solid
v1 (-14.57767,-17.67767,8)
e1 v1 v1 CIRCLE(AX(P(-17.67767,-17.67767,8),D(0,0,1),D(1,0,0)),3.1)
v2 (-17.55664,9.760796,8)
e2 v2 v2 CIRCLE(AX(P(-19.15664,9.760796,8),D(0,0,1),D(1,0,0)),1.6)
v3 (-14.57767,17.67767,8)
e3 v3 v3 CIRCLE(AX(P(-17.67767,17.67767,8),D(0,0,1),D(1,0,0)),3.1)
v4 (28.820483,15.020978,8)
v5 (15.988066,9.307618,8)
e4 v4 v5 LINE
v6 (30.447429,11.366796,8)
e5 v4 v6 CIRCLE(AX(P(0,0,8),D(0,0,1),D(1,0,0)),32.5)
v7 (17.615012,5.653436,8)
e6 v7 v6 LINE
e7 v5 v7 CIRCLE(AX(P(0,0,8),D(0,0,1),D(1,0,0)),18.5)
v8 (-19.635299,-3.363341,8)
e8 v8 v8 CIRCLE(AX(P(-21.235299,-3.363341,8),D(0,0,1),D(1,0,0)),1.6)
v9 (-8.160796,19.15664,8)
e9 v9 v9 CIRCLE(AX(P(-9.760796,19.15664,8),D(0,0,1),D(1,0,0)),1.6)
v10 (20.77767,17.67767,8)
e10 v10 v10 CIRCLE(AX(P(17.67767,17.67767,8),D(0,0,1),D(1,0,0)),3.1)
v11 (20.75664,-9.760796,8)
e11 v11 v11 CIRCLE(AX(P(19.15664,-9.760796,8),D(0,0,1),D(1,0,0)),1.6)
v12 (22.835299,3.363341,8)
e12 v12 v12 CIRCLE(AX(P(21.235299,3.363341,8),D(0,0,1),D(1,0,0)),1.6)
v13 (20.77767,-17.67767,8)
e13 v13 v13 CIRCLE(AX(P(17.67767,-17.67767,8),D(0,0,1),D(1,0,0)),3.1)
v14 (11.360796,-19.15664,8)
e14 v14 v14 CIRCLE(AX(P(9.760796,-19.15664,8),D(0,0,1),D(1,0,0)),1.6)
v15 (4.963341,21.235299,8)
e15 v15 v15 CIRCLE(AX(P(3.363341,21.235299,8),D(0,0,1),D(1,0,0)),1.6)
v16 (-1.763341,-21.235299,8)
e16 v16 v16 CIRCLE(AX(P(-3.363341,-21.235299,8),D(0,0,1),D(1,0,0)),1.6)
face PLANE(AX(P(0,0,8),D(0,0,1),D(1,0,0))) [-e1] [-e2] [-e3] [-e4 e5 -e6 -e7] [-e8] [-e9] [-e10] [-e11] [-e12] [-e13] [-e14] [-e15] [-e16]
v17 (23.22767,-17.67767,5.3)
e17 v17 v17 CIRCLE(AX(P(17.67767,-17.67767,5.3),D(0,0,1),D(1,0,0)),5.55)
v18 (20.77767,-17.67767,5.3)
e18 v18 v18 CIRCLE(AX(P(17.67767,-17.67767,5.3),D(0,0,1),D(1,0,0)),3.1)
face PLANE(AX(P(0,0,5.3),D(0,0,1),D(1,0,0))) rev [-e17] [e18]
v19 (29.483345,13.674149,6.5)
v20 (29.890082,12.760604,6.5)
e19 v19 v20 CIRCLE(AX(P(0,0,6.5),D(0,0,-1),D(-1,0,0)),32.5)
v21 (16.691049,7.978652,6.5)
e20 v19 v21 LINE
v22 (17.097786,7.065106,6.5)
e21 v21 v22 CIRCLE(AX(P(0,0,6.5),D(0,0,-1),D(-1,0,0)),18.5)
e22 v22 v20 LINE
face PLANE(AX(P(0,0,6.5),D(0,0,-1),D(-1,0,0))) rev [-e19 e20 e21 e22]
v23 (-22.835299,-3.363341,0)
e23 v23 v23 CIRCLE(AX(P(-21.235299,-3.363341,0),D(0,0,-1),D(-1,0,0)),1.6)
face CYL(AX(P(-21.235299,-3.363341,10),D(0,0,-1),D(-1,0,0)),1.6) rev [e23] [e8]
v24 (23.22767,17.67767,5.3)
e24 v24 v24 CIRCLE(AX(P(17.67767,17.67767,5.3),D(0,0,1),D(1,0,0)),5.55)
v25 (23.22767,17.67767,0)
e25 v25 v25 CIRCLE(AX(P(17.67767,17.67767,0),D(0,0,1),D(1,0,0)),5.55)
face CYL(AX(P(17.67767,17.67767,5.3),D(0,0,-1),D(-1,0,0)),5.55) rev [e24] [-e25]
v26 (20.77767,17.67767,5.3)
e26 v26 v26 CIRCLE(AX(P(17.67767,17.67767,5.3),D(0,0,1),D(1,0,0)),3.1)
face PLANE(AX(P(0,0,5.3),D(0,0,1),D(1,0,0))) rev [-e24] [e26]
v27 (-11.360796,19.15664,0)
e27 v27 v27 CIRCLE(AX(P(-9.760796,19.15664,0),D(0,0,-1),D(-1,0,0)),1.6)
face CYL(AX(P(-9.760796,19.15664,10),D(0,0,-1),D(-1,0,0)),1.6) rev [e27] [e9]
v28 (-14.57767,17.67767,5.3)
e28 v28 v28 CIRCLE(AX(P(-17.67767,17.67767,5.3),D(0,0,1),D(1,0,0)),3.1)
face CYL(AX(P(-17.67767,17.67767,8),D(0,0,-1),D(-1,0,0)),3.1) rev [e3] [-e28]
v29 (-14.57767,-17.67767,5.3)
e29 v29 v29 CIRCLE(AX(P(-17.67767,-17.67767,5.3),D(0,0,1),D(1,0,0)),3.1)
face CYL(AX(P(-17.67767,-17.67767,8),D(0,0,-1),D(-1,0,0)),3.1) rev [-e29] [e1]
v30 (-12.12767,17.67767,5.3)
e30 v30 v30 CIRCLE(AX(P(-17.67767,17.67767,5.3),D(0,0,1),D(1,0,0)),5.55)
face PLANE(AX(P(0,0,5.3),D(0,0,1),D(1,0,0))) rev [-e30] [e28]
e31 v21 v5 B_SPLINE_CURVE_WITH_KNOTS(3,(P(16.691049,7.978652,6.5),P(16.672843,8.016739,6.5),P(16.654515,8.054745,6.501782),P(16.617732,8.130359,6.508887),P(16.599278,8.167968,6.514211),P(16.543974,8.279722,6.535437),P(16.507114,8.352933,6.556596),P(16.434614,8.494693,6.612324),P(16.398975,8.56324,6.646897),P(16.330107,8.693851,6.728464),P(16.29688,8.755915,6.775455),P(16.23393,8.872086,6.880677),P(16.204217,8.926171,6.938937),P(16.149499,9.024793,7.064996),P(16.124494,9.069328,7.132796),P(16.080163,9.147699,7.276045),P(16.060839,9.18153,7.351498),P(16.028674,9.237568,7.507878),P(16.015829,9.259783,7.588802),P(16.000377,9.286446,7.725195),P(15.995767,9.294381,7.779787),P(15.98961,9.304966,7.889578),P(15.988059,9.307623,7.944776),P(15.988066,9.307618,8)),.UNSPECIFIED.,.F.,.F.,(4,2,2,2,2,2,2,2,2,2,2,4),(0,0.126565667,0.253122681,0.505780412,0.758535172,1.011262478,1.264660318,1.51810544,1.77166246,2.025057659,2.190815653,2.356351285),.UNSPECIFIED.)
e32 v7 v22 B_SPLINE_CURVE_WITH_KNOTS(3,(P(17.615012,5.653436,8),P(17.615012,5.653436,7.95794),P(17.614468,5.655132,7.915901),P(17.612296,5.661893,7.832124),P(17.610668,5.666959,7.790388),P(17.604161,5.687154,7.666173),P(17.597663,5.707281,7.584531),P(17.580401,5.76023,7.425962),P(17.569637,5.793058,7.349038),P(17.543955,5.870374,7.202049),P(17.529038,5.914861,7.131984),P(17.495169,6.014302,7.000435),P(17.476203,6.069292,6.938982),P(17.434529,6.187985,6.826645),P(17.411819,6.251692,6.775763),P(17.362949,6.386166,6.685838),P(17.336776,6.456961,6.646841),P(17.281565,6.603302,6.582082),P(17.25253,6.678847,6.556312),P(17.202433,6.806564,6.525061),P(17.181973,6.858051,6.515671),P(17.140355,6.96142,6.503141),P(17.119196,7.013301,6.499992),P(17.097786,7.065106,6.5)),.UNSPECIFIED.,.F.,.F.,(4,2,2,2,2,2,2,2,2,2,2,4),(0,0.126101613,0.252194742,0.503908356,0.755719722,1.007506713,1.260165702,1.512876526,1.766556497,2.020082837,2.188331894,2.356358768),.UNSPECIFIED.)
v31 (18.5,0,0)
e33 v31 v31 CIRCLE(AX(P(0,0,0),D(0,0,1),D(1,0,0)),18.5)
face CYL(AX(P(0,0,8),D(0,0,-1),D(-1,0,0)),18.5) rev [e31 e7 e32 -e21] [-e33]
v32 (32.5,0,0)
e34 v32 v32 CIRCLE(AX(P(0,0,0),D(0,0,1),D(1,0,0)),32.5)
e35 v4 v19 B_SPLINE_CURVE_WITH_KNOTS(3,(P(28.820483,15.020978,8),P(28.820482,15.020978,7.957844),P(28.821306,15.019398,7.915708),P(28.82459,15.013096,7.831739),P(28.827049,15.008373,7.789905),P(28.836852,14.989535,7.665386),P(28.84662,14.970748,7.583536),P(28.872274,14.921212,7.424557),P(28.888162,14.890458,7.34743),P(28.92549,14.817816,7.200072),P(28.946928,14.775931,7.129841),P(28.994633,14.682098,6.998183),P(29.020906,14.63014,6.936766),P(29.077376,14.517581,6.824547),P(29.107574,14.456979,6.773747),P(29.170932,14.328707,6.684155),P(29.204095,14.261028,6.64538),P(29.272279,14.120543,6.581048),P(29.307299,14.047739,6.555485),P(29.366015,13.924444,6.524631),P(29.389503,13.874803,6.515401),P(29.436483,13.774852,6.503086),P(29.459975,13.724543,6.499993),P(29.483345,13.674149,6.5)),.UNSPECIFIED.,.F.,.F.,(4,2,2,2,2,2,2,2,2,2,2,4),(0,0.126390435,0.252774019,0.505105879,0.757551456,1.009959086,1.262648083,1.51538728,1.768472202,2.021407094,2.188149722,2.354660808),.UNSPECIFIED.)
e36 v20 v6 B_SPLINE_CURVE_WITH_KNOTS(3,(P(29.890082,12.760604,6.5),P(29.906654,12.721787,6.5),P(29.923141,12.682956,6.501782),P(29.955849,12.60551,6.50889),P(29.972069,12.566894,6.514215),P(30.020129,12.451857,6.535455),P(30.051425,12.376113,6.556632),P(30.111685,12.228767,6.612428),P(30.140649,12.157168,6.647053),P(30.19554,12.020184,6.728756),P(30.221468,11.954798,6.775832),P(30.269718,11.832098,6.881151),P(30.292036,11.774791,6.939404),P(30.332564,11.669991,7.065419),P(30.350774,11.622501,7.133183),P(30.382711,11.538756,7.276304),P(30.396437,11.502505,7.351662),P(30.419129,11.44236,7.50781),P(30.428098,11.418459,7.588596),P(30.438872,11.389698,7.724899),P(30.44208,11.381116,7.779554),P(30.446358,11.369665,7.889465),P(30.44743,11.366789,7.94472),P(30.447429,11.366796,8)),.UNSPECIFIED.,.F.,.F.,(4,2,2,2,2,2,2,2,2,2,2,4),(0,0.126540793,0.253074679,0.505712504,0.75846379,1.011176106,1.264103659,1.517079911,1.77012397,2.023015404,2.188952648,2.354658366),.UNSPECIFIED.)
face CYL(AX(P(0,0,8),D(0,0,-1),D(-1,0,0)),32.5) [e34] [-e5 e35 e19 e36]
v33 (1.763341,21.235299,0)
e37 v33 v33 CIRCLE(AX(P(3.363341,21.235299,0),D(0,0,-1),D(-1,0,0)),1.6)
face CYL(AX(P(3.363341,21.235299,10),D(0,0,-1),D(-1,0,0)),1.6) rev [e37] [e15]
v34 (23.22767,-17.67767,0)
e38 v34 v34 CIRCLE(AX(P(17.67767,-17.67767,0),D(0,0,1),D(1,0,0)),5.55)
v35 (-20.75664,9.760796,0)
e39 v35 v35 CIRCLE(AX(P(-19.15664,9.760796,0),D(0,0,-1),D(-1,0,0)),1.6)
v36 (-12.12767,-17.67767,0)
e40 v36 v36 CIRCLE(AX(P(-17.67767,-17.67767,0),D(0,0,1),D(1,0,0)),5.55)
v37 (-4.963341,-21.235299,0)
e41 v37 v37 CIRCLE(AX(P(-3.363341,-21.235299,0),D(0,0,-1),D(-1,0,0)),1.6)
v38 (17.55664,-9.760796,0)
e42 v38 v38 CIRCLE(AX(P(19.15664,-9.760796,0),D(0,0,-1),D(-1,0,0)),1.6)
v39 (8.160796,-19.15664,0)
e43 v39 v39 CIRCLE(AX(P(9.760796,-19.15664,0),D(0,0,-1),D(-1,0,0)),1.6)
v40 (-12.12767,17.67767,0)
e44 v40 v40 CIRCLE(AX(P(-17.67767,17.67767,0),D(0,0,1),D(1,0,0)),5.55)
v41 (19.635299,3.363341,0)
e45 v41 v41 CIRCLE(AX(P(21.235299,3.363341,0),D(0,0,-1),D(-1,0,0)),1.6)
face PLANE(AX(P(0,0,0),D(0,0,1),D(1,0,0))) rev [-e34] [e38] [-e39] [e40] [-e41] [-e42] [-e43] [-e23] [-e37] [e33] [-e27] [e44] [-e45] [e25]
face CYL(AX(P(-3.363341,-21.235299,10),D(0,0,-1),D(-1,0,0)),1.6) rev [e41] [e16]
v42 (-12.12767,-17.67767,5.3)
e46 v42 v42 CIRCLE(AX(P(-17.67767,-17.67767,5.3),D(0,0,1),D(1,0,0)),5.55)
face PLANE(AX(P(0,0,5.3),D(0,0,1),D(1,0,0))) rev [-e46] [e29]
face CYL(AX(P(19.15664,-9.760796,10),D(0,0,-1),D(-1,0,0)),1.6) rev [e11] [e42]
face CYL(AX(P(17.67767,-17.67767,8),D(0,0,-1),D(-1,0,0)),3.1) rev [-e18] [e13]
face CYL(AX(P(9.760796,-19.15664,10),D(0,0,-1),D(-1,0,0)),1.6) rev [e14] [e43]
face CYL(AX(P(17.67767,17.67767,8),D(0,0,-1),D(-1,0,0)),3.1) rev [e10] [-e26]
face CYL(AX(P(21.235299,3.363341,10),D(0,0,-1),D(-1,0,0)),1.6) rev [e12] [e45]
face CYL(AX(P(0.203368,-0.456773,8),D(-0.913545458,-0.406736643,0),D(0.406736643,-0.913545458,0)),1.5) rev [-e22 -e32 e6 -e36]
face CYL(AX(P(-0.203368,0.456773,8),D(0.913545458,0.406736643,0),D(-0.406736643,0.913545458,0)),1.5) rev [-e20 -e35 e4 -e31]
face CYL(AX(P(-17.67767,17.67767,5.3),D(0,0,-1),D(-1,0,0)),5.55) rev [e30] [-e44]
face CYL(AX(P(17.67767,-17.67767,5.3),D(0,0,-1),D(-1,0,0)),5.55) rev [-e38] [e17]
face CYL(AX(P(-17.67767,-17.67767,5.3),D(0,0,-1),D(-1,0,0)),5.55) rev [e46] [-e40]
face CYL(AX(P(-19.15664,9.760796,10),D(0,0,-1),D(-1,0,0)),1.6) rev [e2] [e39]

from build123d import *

# Parameters (mm, degrees)
SKETCH1_R           = 32.5
SKETCH1_R_2         = 3.1
SKETCH1_R_3         = 18.5
BOSS_EXTRUDE2_DEPTH = 8
SKETCH1_6_R         = 18.5
SKETCH1_6_R_2       = 5.55
SKETCH1_6_R_3       = 3.1
CUT_EXTRUDE2_DEPTH  = 5.3
SKETCH2_R           = 1.6
CUT_EXTRUDE3_DEPTH  = 10
CUT_EXTRUDE4_DEPTH  = 1.5
FILLET1_R           = 1.5


with BuildPart() as part:
    # Sketch1 → Boss-Extrude2 (new body)
    with BuildSketch(Plane.XY):
        Circle(SKETCH1_R)
        with Locations((17.67766953, 17.67766953)):
            Circle(SKETCH1_R_2, mode=Mode.SUBTRACT)
        with Locations((17.67766953, -17.67766953)):
            Circle(SKETCH1_R_2, mode=Mode.SUBTRACT)
        with Locations((-17.67766953, -17.67766953)):
            Circle(SKETCH1_R_2, mode=Mode.SUBTRACT)
        with Locations((-17.67766953, 17.67766953)):
            Circle(SKETCH1_R_2, mode=Mode.SUBTRACT)
        Circle(SKETCH1_R_3, mode=Mode.SUBTRACT)
    extrude(amount=BOSS_EXTRUDE2_DEPTH)

    # Sketch1<6> → Cut-Extrude2 (cut)
    # profile 1 of 8: a face of its own
    with BuildSketch(Plane.XY):
        Circle(SKETCH1_6_R)
    # profile 2 of 8: a face of its own
    with BuildSketch(Plane.XY):
        with Locations((17.67766953, 17.67766953)):
            Circle(SKETCH1_6_R_2)
        with Locations((17.67766953, 17.67766953)):
            Circle(SKETCH1_6_R_3, mode=Mode.SUBTRACT)
    # profile 3 of 8: a face of its own
    with BuildSketch(Plane.XY):
        Circle(SKETCH1_6_R)
    # profile 4 of 8: a face of its own
    with BuildSketch(Plane.XY):
        with Locations((17.67766953, -17.67766953)):
            Circle(SKETCH1_6_R_2)
        with Locations((17.67766953, -17.67766953)):
            Circle(SKETCH1_6_R_3, mode=Mode.SUBTRACT)
    # profile 5 of 8: a face of its own
    with BuildSketch(Plane.XY):
        Circle(SKETCH1_6_R)
    # profile 6 of 8: a face of its own
    with BuildSketch(Plane.XY):
        with Locations((-17.67766953, -17.67766953)):
            Circle(SKETCH1_6_R_2)
        with Locations((-17.67766953, -17.67766953)):
            Circle(SKETCH1_6_R_3, mode=Mode.SUBTRACT)
    # profile 7 of 8: a face of its own
    with BuildSketch(Plane.XY):
        Circle(SKETCH1_6_R)
    # profile 8 of 8: a face of its own
    with BuildSketch(Plane.XY):
        with Locations((-17.67766953, 17.67766953)):
            Circle(SKETCH1_6_R_2)
        with Locations((-17.67766953, 17.67766953)):
            Circle(SKETCH1_6_R_3, mode=Mode.SUBTRACT)
    extrude(amount=CUT_EXTRUDE2_DEPTH, mode=Mode.SUBTRACT)

    # Sketch2 → Cut-Extrude3 (cut)
    with BuildSketch(Plane(origin=(0, 0, 0), x_dir=(-1, 0, 0), z_dir=(0, 0, -1))):
        with Locations((9.760795744, 19.15664027)):
            Circle(SKETCH2_R)
        with Locations((19.15664027, 9.760795744)):
            Circle(SKETCH2_R)
        with Locations((21.235299323, -3.363340998)):
            Circle(SKETCH2_R)
        with Locations((3.363340998, -21.235299323)):
            Circle(SKETCH2_R)
        with Locations((-9.760795744, -19.15664027)):
            Circle(SKETCH2_R)
        with Locations((-19.15664027, -9.760795744)):
            Circle(SKETCH2_R)
        with Locations((-21.235299323, 3.363340998)):
            Circle(SKETCH2_R)
        with Locations((-3.363340998, 21.235299323)):
            Circle(SKETCH2_R)
    extrude(amount=-CUT_EXTRUDE3_DEPTH, mode=Mode.SUBTRACT)

    # Sketch4 → Cut-Extrude4 (cut)
    with BuildSketch(Plane.XY.offset(8)):
        Polygon((14.516655151, 4.273958731), (32.787564304, 12.408691592), (31.160617731, 16.062873423), (12.889708578, 7.928140561), align=None)
    extrude(amount=-CUT_EXTRUDE4_DEPTH, mode=Mode.SUBTRACT)

    # Fillet1
    fillet1_edges = [part.edges().sort_by_distance(p)[0] for p in [
        (22.404274162, 12.164298088, 6.5),
        (24.031220735, 8.510116257, 6.5),
    ]]
    fillet(fillet1_edges, radius=FILLET1_R - 0.0001)  # a hair under: the kernel refuses the full size


solid = part.part
